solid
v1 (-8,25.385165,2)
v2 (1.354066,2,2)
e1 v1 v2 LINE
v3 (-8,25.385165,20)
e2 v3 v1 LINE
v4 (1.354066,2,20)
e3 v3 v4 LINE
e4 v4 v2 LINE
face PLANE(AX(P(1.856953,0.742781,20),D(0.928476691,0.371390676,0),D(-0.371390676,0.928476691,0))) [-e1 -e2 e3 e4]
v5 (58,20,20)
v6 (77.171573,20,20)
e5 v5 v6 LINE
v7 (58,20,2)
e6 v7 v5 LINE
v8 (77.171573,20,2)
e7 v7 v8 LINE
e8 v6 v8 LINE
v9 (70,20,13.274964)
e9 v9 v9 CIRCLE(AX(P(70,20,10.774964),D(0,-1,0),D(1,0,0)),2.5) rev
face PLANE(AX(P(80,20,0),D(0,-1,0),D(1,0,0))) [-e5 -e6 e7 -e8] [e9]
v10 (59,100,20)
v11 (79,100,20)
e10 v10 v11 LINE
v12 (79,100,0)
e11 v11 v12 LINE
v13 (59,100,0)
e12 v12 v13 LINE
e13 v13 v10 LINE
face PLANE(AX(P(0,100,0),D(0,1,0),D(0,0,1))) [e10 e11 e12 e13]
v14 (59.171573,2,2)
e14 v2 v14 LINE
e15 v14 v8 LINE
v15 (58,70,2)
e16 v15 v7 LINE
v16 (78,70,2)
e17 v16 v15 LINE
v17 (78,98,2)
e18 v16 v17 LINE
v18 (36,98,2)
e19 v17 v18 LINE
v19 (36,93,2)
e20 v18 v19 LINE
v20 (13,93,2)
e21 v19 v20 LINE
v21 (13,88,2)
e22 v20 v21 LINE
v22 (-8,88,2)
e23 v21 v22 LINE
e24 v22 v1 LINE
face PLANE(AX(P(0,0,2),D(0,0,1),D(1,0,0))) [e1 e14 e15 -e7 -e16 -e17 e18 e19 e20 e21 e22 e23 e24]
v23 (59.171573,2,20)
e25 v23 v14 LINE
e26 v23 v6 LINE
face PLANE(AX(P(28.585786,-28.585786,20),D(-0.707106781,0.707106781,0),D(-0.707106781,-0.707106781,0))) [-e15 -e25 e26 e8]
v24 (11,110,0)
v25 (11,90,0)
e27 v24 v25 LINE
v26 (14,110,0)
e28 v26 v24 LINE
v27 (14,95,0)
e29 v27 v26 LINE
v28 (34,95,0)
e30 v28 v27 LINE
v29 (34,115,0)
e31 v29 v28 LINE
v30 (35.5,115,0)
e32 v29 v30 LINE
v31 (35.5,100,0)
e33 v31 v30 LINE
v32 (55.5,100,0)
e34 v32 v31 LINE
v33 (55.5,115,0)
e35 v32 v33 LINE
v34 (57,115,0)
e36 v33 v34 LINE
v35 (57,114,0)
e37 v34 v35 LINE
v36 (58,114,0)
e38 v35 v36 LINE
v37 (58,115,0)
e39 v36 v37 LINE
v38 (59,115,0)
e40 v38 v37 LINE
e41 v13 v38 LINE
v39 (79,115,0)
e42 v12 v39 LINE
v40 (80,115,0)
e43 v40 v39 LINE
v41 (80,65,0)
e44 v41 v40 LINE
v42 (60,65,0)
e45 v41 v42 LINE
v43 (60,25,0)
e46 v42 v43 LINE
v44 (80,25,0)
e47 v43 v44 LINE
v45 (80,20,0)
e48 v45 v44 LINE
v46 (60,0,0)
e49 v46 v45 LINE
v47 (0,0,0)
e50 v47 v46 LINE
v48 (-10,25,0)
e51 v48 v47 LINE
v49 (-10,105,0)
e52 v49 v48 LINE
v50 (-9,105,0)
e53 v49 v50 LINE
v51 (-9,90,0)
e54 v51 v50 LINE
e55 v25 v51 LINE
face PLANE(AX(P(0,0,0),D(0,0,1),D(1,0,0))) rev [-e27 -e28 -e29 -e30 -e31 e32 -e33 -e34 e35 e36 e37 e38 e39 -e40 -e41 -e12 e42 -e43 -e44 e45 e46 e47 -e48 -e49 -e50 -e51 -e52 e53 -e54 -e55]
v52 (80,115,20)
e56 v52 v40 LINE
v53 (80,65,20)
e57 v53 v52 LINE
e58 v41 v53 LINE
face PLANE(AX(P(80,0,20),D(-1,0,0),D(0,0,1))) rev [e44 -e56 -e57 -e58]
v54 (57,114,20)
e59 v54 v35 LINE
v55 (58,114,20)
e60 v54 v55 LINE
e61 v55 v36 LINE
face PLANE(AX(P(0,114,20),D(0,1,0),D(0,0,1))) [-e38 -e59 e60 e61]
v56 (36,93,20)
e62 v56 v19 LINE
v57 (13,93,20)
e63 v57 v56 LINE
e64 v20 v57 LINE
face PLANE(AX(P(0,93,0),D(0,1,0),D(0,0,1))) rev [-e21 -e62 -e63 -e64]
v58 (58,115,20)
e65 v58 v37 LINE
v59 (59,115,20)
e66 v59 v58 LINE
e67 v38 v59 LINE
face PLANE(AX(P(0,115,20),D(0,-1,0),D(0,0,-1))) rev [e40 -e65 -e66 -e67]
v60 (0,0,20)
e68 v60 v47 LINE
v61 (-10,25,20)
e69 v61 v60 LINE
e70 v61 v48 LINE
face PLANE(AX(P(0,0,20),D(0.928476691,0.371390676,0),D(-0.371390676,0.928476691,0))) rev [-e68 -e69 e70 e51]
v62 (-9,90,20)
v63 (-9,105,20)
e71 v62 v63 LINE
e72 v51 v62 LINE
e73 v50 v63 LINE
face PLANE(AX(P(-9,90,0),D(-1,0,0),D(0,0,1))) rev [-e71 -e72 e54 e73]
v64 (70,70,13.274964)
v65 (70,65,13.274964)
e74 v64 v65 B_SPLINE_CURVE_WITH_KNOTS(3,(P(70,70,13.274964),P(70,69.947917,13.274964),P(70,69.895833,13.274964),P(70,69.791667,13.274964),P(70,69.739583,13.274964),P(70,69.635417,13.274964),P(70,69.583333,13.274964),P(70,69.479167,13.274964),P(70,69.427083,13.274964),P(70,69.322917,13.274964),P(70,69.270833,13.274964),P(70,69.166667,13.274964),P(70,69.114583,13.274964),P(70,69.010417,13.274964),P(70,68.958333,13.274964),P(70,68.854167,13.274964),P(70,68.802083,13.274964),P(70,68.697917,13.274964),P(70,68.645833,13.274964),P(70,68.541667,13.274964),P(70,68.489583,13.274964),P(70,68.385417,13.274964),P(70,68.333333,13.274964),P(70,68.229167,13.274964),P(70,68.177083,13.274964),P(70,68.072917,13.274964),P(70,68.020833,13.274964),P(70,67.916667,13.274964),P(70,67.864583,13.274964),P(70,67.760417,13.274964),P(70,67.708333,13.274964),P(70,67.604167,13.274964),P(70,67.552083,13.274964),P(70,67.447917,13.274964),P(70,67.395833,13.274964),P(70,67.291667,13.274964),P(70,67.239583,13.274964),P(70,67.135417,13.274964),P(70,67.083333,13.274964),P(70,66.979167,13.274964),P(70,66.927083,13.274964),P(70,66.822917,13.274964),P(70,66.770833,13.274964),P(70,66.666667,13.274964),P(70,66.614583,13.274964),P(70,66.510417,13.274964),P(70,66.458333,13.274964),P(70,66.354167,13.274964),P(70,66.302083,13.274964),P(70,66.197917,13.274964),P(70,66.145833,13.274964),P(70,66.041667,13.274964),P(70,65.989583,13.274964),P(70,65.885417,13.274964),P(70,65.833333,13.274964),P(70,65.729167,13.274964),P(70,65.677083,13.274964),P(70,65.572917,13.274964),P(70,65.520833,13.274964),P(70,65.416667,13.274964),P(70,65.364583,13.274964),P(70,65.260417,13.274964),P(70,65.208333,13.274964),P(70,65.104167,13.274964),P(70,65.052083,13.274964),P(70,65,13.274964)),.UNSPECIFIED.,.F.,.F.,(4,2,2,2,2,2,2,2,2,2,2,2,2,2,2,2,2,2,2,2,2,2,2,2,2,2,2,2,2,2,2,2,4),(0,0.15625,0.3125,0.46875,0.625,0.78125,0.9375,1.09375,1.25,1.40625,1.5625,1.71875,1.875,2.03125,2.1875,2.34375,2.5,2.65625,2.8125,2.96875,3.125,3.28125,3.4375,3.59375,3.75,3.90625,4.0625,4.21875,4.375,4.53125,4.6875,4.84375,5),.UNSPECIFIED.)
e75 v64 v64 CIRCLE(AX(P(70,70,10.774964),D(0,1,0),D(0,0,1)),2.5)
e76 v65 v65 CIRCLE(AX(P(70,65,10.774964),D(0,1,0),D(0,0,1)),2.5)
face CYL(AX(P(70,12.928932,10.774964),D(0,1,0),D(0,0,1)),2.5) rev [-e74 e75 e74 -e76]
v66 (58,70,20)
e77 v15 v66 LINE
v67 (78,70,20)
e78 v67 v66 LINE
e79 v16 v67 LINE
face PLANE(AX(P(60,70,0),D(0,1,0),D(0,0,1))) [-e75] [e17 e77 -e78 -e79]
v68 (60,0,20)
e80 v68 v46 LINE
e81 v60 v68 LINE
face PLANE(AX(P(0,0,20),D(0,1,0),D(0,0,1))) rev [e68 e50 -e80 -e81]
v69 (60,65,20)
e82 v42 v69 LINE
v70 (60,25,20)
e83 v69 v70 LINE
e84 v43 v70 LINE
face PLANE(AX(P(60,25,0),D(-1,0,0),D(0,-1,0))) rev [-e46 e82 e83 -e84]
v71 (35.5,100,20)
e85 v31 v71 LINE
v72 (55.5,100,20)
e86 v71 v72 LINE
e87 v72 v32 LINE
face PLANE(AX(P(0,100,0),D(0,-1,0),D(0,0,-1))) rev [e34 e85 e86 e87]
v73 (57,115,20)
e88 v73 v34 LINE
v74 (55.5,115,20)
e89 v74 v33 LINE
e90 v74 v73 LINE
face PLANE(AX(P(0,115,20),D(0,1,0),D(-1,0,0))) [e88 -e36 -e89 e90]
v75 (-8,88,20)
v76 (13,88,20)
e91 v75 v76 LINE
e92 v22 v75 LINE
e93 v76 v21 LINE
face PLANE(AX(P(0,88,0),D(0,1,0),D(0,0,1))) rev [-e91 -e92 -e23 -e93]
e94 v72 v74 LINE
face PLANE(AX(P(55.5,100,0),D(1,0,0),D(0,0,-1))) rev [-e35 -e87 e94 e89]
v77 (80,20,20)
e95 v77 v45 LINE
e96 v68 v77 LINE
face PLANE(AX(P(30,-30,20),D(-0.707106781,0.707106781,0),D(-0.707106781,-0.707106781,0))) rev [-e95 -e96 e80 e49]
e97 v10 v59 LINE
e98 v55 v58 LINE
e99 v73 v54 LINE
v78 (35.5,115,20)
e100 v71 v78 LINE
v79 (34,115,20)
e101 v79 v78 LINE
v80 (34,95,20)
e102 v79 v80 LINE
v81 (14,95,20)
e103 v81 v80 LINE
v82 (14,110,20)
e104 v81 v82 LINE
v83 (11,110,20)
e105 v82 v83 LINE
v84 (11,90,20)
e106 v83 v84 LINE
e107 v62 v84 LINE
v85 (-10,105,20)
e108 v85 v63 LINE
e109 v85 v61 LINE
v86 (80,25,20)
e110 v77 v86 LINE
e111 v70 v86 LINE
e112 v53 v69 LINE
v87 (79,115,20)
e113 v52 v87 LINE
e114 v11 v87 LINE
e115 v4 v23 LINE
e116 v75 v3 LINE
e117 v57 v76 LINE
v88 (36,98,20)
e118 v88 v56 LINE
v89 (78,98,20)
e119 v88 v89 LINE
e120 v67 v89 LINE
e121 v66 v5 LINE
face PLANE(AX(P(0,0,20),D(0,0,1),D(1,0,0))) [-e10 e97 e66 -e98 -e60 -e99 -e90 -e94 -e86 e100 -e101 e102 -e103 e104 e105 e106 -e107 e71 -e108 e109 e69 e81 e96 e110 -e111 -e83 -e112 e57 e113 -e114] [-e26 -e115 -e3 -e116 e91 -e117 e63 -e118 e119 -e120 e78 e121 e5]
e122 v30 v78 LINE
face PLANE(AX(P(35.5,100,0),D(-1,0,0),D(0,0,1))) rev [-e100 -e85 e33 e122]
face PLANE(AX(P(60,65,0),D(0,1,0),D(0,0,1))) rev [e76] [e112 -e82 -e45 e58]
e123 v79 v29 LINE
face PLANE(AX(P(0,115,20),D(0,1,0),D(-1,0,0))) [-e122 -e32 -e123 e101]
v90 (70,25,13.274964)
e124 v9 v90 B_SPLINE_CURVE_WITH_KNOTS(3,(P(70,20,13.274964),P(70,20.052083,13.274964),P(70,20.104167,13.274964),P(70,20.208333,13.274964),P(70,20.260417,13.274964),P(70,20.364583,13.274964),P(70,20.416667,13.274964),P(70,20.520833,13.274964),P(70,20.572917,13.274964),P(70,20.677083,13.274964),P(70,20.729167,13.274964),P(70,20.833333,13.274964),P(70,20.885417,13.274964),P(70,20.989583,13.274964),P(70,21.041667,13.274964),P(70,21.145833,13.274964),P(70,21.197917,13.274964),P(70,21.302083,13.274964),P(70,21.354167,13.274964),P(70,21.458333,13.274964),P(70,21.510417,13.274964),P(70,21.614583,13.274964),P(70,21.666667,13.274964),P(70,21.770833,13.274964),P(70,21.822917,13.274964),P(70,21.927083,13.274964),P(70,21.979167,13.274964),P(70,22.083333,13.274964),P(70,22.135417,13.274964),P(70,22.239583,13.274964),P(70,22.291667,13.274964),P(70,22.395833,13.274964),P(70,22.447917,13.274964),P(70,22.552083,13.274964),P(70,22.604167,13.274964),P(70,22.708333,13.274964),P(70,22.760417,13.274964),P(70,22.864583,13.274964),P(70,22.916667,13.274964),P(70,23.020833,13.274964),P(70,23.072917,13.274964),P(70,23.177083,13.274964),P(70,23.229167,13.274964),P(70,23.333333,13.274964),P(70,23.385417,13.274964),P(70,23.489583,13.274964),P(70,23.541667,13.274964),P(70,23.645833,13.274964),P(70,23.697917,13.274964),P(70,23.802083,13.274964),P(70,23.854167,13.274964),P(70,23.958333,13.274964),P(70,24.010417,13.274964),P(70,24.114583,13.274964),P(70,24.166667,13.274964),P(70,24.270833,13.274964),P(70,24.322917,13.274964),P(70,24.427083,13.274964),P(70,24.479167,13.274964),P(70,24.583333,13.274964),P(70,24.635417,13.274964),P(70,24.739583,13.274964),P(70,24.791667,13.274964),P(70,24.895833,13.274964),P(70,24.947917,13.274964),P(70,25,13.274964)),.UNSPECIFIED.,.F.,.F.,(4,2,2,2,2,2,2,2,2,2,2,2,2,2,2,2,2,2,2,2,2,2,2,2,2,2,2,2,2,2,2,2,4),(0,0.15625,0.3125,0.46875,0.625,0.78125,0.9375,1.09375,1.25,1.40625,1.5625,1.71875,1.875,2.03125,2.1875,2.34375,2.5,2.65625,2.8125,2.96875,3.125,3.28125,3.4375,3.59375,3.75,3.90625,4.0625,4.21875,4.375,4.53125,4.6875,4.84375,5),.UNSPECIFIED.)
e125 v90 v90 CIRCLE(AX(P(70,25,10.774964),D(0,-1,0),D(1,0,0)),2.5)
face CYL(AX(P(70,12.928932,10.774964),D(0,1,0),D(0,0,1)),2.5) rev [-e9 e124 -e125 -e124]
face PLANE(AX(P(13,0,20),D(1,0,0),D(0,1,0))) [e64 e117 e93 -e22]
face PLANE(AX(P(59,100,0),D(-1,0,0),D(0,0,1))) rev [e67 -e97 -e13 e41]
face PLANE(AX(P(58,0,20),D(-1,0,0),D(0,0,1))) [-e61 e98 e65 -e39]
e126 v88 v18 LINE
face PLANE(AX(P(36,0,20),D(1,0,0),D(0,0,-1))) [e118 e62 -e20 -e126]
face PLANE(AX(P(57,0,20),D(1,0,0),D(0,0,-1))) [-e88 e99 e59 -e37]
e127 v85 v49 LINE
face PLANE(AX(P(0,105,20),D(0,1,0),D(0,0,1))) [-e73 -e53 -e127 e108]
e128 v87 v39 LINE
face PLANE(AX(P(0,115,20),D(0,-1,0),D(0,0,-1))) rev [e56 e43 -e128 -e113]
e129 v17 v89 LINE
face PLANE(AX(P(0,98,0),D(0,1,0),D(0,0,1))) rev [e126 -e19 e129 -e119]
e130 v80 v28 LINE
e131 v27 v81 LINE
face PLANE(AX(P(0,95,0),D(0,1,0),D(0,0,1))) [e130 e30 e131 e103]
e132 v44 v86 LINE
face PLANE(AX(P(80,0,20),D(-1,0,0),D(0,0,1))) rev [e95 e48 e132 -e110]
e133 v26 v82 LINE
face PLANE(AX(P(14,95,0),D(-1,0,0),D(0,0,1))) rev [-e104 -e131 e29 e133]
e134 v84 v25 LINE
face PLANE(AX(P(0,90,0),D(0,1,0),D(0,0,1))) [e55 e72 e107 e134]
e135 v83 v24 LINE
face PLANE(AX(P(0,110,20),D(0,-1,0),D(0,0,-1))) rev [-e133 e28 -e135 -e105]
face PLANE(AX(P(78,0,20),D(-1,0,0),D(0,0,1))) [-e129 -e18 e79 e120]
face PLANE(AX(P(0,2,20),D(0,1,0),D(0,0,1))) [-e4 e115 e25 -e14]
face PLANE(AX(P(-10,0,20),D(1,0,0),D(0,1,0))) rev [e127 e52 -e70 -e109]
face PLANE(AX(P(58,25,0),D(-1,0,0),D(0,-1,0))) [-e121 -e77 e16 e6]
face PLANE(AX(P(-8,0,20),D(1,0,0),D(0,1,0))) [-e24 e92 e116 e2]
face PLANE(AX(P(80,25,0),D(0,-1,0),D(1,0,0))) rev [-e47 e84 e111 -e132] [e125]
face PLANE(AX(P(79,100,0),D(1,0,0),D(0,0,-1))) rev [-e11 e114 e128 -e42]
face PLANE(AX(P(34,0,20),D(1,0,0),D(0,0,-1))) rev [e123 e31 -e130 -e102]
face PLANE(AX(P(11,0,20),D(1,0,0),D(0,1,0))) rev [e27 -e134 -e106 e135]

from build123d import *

# Parameters (mm, degrees)
BOSS_EXTRUDE1_DEPTH = 20
SKETCH2_W           = 20
SKETCH2_H           = 40
CUT_EXTRUDE1_DEPTH  = 142.509716981
SKETCH20_W          = 20
SKETCH20_H          = 20
CUT_EXTRUDE11_DEPTH = 15
SKETCH22_W          = 20
SKETCH22_H          = 20
CUT_EXTRUDE13_DEPTH = 15
SKETCH21_W          = 20
SKETCH21_H          = 20
CUT_EXTRUDE12_DEPTH = 15
SHELL1_START        = 2
SHELL1_DEPTH        = 18
CUT_EXTRUDE10_REACH = 110.167
SKETCH19_R          = 2.5


# Read off the part's stored shape, not the designer's step: Shell1
with BuildPart() as part:
    # Sketch1 → Boss-Extrude1 (new body)
    with BuildSketch(Plane.XY):
        Polygon((58, 114), (58, 115), (80, 115), (80, 20), (60, 0), (0, 0), (-10, 25), (-10, 105), (11, 105), (11, 110), (12, 110), (34, 110), (34, 115), (35, 115), (57, 115), (57, 114), align=None)
    extrude(amount=BOSS_EXTRUDE1_DEPTH)

    # Sketch2 → Cut-Extrude1 (cut, through all)
    with BuildSketch(Plane.XY.offset(20)):
        with Locations((70, 45)):
            Rectangle(SKETCH2_W, SKETCH2_H)
    extrude(amount=-CUT_EXTRUDE1_DEPTH, mode=Mode.SUBTRACT)

    # Sketch20 → Cut-Extrude11 (cut)
    with BuildSketch(Plane(origin=(0, 115, 0), x_dir=(1, 0, 0), z_dir=(0, 1, 0))):
        with Locations((69, -10)):
            Rectangle(SKETCH20_W, SKETCH20_H)
        with Locations((45.5, -10)):
            Rectangle(SKETCH20_W, SKETCH20_H)
    extrude(amount=-CUT_EXTRUDE11_DEPTH, mode=Mode.SUBTRACT)

    # Sketch22 → Cut-Extrude13 (cut)
    with BuildSketch(Plane(origin=(0, 105, 0), x_dir=(1, 0, 0), z_dir=(0, 1, 0))):
        with Locations((1, -10)):
            Rectangle(SKETCH22_W, SKETCH22_H)
    extrude(amount=-CUT_EXTRUDE13_DEPTH, mode=Mode.SUBTRACT)

    # Sketch21 → Cut-Extrude12 (cut)
    with BuildSketch(Plane(origin=(0, 110, 0), x_dir=(1, 0, 0), z_dir=(0, 1, 0))):
        with Locations((24, -10)):
            Rectangle(SKETCH21_W, SKETCH21_H)
    extrude(amount=-CUT_EXTRUDE12_DEPTH, mode=Mode.SUBTRACT)

    # Shell1 outline → Shell1 (cut)
    with BuildSketch(Plane.XY.offset(SHELL1_START)):
        Polygon((58, 20), (58, 70), (78, 70), (78, 98), (36, 98), (36, 93), (13, 93), (13, 88), (-8, 88), (-8, 25.385164807), (1.354065923, 2), (59.171572875, 2), (77.171572875, 20), align=None)
    extrude(amount=SHELL1_DEPTH, mode=Mode.SUBTRACT)

    # Cut-Extrude10: up to this face of the body (flat: up to its plane)
    cut_extrude10_end = Plane(part.part.faces().sort_by_distance((67.585786438, 20, 11))[0])
    # Sketch19 → Cut-Extrude10 (cut, up to the picked face)
    with BuildSketch(Plane(origin=(0, 70, 0), x_dir=(1, 0, 0), z_dir=(0, 1, 0)), mode=Mode.PRIVATE) as cut_extrude10_sk1:
        with Locations(Location((70, -10.774964387, 0), (0, 0, 270))):
            Circle(SKETCH19_R)
    cut_extrude10_tool1 = split(extrude(cut_extrude10_sk1.sketch, amount=-CUT_EXTRUDE10_REACH, mode=Mode.PRIVATE), bisect_by=cut_extrude10_end, keep=Keep.BOTH, mode=Mode.PRIVATE)
    add(cut_extrude10_tool1.solids().sort_by(Axis((70, 70, 10.774964), (0, -1, 0)))[0], mode=Mode.SUBTRACT)


solid = part.part
